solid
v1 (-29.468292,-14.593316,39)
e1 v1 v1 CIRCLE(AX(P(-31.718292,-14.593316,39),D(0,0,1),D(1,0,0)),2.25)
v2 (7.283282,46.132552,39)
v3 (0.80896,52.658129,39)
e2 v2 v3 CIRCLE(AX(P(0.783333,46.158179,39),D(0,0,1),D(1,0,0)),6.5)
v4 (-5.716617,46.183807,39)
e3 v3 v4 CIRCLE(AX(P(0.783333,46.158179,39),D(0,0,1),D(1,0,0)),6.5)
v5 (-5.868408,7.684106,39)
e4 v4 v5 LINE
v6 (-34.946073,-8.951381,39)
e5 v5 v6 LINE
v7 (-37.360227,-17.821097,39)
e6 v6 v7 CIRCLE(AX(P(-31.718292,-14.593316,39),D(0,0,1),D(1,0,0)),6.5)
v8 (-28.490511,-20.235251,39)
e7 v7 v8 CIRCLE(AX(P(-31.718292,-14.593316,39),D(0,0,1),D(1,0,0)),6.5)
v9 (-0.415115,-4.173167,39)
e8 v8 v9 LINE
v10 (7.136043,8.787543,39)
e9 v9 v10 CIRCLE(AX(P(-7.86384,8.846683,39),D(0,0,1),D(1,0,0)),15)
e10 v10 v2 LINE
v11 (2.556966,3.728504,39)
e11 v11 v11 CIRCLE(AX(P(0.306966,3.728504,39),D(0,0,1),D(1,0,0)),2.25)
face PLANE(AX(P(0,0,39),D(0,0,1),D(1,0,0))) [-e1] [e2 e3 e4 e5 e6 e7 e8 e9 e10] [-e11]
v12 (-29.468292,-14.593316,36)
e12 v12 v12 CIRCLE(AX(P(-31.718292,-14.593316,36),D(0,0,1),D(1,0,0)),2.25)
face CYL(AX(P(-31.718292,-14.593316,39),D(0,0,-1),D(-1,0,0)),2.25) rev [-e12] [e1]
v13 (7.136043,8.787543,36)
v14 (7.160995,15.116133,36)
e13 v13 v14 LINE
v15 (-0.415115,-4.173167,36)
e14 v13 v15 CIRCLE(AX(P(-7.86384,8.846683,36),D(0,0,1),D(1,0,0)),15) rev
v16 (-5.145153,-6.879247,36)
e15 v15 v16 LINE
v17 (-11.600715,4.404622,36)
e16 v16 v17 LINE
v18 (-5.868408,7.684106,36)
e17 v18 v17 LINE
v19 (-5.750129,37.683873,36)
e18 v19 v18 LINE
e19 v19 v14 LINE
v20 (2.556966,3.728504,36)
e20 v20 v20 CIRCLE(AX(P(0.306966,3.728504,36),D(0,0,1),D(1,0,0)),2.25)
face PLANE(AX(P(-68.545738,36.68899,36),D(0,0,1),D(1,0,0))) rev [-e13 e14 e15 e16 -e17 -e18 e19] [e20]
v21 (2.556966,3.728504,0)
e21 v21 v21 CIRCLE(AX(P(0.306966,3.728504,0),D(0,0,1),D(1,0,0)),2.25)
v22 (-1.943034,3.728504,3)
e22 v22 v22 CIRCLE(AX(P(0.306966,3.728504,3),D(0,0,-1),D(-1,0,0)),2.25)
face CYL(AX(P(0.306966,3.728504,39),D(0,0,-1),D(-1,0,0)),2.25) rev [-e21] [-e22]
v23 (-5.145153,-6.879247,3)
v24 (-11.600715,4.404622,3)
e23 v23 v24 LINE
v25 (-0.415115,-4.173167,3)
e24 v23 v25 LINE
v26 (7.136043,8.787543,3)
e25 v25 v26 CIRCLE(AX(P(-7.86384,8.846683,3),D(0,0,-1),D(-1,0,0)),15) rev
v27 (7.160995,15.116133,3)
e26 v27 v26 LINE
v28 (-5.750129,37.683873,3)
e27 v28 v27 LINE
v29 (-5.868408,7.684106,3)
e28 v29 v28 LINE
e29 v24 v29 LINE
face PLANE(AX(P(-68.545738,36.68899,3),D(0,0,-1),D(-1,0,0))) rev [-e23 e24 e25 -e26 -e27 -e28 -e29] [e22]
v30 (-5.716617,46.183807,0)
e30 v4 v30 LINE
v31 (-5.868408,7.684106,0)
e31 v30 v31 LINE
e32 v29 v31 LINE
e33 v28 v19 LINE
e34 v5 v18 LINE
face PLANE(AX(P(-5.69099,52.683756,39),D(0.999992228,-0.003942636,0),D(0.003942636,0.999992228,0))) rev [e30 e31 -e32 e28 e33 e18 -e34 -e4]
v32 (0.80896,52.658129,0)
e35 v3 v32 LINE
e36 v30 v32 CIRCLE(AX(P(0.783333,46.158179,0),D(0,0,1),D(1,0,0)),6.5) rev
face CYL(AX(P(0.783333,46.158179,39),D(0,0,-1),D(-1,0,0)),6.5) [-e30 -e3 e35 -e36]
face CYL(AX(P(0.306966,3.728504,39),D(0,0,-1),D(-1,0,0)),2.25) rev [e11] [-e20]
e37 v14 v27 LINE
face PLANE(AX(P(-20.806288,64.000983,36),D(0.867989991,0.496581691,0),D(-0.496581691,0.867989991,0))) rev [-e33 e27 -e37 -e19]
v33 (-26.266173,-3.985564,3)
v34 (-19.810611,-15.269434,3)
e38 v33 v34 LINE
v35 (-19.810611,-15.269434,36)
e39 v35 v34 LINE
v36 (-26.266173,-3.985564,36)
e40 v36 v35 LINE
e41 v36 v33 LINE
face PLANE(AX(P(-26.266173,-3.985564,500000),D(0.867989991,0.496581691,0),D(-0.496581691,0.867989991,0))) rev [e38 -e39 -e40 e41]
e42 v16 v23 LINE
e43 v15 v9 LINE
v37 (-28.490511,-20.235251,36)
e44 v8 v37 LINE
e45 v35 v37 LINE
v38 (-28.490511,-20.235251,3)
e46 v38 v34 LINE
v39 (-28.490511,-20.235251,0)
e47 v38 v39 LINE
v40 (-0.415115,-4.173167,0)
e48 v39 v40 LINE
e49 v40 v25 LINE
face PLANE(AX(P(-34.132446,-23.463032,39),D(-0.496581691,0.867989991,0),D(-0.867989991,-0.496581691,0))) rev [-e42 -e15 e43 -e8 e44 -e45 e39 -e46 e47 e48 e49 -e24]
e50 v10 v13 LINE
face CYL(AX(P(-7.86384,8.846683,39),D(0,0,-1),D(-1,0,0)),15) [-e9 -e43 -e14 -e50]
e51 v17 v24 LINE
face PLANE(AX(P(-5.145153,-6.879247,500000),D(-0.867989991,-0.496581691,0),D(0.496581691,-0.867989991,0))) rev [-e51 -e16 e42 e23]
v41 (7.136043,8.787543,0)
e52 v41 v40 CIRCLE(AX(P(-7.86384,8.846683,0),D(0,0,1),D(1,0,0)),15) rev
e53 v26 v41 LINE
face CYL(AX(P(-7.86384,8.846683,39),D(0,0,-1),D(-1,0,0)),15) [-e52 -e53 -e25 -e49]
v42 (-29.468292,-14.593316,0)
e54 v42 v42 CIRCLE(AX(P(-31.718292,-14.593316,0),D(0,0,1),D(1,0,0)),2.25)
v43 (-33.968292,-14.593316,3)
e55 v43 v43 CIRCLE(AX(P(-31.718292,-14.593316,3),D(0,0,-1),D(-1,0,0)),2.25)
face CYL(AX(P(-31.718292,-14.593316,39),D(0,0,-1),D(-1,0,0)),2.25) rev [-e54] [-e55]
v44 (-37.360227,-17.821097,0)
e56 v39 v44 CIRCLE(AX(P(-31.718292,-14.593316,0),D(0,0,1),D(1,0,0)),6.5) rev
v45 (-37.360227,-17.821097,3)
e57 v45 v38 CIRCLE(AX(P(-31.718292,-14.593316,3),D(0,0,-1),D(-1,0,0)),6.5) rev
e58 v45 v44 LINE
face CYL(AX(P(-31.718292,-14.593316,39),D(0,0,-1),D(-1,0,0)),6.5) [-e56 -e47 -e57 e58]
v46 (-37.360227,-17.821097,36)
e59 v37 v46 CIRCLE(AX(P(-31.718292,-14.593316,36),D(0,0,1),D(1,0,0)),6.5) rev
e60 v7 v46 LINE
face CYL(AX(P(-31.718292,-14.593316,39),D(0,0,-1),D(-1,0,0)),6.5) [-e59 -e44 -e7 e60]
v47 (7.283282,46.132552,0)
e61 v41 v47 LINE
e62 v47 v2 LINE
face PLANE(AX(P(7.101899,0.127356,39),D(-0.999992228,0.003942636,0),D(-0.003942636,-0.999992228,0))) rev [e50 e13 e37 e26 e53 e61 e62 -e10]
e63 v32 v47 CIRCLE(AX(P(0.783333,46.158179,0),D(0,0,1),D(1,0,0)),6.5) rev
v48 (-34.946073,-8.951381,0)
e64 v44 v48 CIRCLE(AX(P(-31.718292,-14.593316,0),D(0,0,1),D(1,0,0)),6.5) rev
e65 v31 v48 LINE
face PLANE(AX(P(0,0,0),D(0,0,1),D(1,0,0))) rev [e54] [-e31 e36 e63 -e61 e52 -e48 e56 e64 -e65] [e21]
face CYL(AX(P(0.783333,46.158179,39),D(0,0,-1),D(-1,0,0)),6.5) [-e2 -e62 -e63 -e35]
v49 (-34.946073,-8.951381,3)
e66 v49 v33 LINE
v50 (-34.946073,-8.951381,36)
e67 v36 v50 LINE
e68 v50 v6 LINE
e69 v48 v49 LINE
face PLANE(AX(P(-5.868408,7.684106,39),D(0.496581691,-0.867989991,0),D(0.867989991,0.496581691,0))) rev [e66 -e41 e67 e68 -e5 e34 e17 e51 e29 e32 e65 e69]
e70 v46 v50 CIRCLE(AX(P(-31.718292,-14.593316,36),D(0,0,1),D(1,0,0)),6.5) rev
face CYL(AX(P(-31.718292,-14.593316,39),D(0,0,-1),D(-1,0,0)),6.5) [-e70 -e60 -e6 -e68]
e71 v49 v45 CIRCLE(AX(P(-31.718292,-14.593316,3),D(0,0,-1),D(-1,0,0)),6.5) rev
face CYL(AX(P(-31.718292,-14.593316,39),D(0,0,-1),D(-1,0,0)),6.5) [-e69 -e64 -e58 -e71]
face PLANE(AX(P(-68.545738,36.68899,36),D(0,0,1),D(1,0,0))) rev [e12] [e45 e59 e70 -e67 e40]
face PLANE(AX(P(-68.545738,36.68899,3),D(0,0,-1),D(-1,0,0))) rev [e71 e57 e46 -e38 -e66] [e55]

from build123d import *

# Parameters (mm, degrees)
SKETCH1_R           = 2.25
BOSS_EXTRUDE1_DEPTH = 39
SKETCH2_W           = 55
SKETCH2_H           = 33
CUT_EXTRUDE1_DEPTH  = 81.036070374
FILLET1_R           = 6.5
FILLET2_R           = 15
BOSS_EXTRUDE2_REACH = 76.379
FILLET3_R           = 6.5


with BuildPart() as part:
    # Sketch1 → Boss-Extrude1 (new body)
    with BuildSketch(Plane.XY):
        Polygon((7.10189894, 0.127356388), (7.308909237, 52.632501802), (-5.690989724, 52.683756073), (-5.868408354, 7.684105823), (-40.588007992, -12.179161807), (-34.132446013, -23.46303169), align=None)
        with Locations((-31.718292061, -14.593315758)):
            Circle(SKETCH1_R, mode=Mode.SUBTRACT)
        with Locations((0.306965546, 3.728504465)):
            Circle(SKETCH1_R, mode=Mode.SUBTRACT)
    extrude(amount=BOSS_EXTRUDE1_DEPTH)

    # Sketch2 → Cut-Extrude1 (cut, through all)
    with BuildSketch(Plane(origin=(1.696387072, -2.965165705, 0), x_dir=(0.8679899909572786, 0.49658169075992264, 0), z_dir=(0.4965816907599227, -0.8679899909572787, 0))):
        with Locations((-13.777933453, 19.5)):
            Rectangle(SKETCH2_W, SKETCH2_H)
    extrude(amount=-CUT_EXTRUDE1_DEPTH, mode=Mode.SUBTRACT)

    # Fillet1
    fillet1_edges = [part.edges().sort_by_distance(p)[0] for p in [
        (-34.132446013, -23.46303169, 1.5),
        (-40.588007992, -12.179161807, 1.5),
        (-34.132446013, -23.46303169, 37.5),
        (-40.588007992, -12.179161807, 37.5),
    ]]
    fillet(fillet1_edges, radius=FILLET1_R - 0.0001)  # a hair under: the kernel refuses the full size

    # Fillet2
    fillet2_edges = [part.edges().sort_by_distance(p)[0] for p in [
        (7.10189894, 0.127356388, 37.5),
        (7.10189894, 0.127356388, 1.5),
    ]]
    fillet(fillet2_edges, radius=FILLET2_R)

    # Sketch3 → Boss-Extrude2 (add, up to next)
    with BuildSketch(Plane.XY.offset(3), mode=Mode.PRIVATE) as boss_extrude2_sk1:
        Polygon((-26.266173142, -3.98556391), (-19.810611162, -15.269433792), (-5.145153373, -6.879247384), (-11.600715353, 4.404622498), align=None)
    boss_extrude2_tool1 = extrude(boss_extrude2_sk1.sketch, amount=BOSS_EXTRUDE2_REACH, mode=Mode.PRIVATE) - part.part
    add(boss_extrude2_tool1.solids().sort_by_distance((-15.705663, -5.432406, 3))[0])

    # Fillet3
    fillet3_edges = [part.edges().sort_by_distance(p)[0] for p in [
        (7.308909237, 52.632501802, 19.5),
        (-5.690989724, 52.683756073, 19.5),
    ]]
    fillet(fillet3_edges, radius=FILLET3_R - 0.0001)  # a hair under: the kernel refuses the full size


solid = part.part
